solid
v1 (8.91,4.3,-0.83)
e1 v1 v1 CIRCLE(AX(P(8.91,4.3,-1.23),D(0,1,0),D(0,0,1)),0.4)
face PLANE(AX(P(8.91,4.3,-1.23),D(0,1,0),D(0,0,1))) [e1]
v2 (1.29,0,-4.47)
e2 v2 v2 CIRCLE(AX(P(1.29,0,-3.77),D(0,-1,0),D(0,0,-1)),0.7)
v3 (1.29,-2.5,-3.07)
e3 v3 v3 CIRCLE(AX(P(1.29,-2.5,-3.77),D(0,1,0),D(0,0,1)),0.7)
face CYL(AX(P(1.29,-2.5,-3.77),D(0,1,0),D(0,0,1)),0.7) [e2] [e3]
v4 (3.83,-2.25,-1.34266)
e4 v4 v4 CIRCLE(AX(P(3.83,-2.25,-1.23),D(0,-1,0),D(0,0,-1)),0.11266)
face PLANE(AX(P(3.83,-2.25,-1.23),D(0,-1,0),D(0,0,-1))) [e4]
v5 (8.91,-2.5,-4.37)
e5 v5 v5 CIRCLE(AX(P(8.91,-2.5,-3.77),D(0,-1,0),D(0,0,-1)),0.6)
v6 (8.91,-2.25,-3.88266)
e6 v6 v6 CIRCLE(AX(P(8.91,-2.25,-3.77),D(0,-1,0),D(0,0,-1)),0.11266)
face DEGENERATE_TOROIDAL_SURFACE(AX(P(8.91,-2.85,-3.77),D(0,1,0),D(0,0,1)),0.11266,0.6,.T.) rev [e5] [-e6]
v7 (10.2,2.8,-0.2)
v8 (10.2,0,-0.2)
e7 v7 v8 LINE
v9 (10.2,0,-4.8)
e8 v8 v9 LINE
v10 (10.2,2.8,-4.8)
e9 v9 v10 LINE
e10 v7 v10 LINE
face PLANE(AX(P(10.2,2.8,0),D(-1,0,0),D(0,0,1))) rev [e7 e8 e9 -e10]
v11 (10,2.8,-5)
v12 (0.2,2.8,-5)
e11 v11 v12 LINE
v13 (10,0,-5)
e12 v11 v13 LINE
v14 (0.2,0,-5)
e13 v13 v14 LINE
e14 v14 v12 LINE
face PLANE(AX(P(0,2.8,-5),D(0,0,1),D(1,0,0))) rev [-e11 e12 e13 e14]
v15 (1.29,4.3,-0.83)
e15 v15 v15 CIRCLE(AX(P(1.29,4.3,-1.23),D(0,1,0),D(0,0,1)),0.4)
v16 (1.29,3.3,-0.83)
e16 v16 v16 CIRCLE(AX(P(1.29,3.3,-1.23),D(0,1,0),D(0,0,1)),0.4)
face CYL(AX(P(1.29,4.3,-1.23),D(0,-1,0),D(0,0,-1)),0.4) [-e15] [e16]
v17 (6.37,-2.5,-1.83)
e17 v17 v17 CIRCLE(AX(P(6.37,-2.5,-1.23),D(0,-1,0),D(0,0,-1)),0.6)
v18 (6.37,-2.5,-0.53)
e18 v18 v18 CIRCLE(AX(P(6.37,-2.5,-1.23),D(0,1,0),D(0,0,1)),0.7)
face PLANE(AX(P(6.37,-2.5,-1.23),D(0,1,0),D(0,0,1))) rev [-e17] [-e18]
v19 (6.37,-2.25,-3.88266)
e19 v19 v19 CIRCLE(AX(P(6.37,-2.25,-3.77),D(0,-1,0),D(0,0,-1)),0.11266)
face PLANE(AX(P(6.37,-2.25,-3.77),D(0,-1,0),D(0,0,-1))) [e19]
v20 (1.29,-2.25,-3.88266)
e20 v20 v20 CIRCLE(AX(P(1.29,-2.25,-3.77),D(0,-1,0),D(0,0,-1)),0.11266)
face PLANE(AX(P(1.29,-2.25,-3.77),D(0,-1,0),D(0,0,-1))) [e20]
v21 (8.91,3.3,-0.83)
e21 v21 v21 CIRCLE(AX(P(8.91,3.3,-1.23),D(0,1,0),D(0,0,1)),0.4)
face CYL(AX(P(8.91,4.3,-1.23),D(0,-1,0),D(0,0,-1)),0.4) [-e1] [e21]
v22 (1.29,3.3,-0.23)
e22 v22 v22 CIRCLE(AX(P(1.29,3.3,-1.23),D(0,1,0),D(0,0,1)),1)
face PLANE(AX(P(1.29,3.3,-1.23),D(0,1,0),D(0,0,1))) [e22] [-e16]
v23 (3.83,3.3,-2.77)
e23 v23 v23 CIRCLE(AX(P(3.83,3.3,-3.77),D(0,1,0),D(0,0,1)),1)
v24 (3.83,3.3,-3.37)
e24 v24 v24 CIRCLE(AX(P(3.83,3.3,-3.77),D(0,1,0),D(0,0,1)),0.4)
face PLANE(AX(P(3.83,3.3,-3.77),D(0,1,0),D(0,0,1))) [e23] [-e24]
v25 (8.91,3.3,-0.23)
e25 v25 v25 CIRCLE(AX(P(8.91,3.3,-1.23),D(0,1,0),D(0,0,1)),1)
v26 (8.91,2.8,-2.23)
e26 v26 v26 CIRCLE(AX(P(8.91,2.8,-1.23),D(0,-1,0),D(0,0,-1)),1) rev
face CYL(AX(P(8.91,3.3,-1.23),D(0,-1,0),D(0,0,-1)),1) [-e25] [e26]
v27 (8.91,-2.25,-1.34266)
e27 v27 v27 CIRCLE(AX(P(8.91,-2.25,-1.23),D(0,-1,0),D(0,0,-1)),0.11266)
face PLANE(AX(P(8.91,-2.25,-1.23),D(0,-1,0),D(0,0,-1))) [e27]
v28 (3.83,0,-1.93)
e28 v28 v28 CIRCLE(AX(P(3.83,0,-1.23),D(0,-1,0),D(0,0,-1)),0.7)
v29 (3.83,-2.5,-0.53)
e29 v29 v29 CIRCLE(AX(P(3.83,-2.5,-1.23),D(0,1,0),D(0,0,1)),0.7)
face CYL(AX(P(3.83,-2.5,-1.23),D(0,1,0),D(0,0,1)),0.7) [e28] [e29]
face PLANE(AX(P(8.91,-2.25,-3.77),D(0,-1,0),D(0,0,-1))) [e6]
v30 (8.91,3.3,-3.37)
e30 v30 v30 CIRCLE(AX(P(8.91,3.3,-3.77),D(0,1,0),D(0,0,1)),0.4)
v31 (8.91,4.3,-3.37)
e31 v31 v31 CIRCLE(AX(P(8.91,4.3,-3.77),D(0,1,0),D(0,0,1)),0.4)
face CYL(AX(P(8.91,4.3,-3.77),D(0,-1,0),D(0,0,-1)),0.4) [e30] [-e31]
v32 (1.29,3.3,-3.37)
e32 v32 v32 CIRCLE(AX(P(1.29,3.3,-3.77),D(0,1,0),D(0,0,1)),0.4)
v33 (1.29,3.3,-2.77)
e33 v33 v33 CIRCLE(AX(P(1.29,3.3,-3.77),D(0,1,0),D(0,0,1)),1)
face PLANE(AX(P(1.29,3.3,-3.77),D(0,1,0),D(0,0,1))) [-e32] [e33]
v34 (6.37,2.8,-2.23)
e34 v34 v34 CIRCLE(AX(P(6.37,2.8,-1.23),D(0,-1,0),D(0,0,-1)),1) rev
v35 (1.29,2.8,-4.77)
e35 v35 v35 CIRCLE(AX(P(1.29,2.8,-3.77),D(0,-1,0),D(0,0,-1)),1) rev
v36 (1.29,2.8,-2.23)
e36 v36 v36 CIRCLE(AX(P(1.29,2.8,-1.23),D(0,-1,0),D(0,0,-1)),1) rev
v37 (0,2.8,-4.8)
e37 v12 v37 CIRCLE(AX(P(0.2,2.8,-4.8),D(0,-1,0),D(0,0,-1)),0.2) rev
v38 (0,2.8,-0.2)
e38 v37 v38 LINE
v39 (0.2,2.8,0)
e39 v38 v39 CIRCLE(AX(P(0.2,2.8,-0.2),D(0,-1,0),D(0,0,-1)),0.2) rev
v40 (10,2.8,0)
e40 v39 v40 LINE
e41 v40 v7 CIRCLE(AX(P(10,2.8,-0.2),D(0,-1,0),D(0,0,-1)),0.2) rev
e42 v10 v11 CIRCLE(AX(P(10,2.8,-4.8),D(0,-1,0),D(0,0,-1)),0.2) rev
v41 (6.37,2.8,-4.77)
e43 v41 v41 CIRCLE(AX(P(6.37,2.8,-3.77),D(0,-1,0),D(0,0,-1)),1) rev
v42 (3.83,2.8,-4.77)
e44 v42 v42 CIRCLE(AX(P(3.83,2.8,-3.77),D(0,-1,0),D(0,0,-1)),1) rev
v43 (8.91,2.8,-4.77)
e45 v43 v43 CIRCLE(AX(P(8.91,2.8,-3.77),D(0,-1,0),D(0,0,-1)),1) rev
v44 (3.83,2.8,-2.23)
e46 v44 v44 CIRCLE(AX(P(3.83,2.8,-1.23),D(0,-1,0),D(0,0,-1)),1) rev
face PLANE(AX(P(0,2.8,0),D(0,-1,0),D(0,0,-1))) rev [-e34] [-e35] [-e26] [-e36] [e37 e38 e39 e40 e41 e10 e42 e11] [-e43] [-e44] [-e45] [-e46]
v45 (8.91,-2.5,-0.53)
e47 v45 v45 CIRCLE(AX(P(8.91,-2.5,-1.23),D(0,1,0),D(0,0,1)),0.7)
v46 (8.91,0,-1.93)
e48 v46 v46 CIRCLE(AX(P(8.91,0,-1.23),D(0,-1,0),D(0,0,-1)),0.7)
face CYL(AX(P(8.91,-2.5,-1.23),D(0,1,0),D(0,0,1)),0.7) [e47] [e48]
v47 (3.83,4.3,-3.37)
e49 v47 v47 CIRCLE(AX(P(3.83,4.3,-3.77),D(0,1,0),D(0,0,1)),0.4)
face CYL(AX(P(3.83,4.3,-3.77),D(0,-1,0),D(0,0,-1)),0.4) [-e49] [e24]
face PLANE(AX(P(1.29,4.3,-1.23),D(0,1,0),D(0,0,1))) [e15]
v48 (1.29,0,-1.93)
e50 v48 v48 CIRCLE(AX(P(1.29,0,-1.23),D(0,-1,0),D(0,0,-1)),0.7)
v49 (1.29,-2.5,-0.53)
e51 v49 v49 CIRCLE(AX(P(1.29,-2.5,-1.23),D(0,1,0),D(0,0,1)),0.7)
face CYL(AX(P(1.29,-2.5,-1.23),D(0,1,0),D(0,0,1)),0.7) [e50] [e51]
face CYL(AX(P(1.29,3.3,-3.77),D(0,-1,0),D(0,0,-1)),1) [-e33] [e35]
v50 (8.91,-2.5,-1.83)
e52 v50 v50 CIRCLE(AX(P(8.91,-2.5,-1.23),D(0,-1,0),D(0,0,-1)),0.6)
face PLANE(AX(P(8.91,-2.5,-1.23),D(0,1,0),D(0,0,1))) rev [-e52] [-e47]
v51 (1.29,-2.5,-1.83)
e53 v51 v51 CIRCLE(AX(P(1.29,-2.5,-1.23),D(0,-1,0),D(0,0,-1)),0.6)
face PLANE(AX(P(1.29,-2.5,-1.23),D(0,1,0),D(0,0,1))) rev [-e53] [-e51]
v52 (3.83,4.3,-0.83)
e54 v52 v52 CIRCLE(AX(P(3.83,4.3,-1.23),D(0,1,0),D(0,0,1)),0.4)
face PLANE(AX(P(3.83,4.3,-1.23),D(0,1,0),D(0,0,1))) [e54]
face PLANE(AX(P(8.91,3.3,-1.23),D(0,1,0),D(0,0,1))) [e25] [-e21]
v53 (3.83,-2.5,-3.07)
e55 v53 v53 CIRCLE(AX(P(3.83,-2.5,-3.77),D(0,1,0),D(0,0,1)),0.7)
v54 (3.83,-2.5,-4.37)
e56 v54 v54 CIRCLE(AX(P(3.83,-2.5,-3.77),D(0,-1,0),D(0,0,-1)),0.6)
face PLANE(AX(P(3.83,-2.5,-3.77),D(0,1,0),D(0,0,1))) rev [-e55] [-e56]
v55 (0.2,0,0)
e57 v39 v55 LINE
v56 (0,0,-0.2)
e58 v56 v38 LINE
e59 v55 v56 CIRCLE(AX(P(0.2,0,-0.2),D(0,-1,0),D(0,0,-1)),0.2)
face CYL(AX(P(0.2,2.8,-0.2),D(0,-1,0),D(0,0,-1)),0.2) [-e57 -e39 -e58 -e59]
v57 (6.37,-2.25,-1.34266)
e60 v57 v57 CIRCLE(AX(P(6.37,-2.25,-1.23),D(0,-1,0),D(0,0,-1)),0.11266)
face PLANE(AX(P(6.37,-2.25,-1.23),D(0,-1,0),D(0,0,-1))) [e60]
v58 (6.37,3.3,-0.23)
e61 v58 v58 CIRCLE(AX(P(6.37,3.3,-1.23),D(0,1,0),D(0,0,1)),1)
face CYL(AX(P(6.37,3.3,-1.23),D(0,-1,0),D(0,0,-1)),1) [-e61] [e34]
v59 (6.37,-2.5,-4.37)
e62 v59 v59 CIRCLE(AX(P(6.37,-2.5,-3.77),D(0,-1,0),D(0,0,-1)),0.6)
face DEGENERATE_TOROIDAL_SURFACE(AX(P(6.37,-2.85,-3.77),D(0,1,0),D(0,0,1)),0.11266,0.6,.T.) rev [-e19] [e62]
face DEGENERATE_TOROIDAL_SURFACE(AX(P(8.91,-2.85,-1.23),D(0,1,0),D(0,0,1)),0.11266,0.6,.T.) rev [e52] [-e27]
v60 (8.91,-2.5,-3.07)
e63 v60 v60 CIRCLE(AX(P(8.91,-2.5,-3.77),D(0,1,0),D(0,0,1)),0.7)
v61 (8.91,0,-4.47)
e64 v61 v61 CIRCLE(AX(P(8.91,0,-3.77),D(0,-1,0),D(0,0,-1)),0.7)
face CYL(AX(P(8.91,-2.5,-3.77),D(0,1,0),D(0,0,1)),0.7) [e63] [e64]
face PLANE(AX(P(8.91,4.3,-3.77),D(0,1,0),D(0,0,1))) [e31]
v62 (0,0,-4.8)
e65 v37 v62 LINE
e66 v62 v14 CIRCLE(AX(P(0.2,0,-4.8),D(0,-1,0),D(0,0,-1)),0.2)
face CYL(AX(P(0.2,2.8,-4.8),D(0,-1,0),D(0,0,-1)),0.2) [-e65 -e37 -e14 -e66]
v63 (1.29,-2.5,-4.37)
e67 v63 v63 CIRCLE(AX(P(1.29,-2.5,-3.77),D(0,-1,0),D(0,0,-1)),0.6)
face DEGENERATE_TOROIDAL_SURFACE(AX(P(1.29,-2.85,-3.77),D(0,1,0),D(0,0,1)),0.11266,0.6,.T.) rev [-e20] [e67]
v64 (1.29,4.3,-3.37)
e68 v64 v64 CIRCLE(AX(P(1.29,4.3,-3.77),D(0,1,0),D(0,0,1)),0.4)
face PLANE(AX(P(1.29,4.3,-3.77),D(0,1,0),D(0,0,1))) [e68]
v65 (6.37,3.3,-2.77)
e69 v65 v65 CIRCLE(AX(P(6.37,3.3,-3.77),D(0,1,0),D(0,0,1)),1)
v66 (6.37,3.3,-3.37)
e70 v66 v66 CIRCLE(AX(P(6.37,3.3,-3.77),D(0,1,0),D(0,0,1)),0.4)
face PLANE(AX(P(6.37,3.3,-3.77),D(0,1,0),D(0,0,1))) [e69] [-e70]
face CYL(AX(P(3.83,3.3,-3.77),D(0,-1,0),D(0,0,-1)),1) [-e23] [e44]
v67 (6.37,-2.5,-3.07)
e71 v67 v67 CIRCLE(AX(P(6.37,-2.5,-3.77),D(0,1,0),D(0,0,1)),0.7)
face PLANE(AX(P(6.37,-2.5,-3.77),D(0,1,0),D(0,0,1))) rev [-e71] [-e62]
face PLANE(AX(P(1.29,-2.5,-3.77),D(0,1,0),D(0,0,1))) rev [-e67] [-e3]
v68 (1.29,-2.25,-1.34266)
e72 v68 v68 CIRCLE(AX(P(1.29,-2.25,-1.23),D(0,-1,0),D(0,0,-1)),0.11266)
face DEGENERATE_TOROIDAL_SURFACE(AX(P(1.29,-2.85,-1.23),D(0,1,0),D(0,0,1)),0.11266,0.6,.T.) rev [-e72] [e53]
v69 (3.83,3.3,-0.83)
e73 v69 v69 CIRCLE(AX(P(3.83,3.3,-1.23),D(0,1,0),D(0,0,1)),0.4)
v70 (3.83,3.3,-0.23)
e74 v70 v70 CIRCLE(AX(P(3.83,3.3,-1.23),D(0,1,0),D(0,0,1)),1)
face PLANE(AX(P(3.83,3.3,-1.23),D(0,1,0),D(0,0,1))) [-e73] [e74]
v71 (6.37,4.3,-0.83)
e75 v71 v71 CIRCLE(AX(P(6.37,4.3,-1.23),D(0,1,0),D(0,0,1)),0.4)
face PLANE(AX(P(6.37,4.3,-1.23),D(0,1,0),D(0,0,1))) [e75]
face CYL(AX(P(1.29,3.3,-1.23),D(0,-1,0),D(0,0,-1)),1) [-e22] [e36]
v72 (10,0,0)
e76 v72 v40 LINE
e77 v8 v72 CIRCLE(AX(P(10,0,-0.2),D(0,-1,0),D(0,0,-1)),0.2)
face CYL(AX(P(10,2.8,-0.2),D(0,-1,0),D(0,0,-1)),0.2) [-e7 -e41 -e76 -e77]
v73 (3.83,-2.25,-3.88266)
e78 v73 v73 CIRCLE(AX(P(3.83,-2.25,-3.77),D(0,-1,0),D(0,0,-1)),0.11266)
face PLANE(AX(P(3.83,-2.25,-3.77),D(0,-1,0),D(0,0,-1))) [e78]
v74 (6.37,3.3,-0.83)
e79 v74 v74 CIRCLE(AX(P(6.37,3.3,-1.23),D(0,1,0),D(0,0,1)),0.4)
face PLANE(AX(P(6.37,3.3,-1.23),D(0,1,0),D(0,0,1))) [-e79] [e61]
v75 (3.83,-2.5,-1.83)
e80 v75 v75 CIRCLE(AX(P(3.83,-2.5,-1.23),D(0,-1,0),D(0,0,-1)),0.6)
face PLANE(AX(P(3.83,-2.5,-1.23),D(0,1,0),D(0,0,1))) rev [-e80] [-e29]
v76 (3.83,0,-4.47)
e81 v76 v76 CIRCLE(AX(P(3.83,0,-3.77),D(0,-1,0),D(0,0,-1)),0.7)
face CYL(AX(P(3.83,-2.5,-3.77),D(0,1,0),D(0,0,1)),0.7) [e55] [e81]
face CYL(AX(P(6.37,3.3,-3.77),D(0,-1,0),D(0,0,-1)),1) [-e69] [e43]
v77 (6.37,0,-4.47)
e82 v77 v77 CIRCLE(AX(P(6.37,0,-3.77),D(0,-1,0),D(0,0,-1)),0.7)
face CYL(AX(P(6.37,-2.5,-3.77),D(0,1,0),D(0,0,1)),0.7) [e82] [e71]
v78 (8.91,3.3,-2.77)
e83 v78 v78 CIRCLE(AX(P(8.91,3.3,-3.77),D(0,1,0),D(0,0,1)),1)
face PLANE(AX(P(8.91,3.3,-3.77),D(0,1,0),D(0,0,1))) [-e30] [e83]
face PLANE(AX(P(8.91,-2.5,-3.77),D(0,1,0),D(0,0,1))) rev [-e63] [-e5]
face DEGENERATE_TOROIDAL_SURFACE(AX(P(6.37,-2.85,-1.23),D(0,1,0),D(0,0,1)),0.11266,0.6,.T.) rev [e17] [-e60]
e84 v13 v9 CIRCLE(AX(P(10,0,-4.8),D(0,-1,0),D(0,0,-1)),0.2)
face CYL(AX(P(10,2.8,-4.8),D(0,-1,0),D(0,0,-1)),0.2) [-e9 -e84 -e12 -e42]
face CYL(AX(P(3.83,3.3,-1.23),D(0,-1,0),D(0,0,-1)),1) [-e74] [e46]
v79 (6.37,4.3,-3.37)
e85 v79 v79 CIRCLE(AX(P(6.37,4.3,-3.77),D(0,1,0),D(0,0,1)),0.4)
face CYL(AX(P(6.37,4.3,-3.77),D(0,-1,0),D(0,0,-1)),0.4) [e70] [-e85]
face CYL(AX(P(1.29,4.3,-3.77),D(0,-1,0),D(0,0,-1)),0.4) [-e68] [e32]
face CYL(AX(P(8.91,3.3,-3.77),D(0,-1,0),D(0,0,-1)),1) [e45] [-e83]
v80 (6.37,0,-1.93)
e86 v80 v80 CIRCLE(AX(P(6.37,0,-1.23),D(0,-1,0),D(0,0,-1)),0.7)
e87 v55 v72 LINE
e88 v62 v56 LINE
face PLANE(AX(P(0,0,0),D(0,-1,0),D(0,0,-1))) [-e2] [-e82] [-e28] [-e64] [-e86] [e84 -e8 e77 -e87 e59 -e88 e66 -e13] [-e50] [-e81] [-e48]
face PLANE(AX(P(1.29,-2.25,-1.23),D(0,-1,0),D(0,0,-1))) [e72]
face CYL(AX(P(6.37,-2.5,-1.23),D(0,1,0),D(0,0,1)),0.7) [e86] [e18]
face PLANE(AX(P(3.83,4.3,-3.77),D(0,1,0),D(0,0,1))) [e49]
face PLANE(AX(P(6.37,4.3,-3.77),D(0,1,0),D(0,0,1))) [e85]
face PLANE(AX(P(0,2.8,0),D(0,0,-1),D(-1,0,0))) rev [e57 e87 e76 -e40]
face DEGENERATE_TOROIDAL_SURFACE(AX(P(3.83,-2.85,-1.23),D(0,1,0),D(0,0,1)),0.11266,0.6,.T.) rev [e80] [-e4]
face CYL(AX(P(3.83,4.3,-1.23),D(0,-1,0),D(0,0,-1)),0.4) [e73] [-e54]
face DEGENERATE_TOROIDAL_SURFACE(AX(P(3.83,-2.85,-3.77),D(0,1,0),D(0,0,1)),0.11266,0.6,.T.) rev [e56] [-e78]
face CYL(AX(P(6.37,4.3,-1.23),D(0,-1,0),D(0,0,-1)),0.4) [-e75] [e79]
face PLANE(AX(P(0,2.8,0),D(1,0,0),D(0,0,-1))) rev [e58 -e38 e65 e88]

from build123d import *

# Parameters (mm, degrees)
SKETCH_1_W          = 10.2
SKETCH_1_H          = 5
EXTRUDE_1_DEPTH     = 2.8
SKETCH_2_R          = 1
EXTRUDE_2_DEPTH     = 0.5
SKETCH_3_R          = 0.4
EXTRUDE_3_DEPTH     = 1
SKETCH_4_R          = 0.7
EXTRUDE_4_DEPTH     = 5.8
SKETCH_5_R          = 0.6
CUT_EXTRUDE_1_DEPTH = 0.25
FILLET_1_R          = 0.6
FILLET_2_R          = 0.2


with BuildPart() as part:
    # 草图1 → 凸台-拉伸1 (new body)
    with BuildSketch(Plane(origin=(0, 0, 0), x_dir=(1, 0, 0), z_dir=(0, 1, 0))):
        with Locations((5.1, 2.5)):
            Rectangle(SKETCH_1_W, SKETCH_1_H)
    extrude(amount=EXTRUDE_1_DEPTH)

    # 草图2 → 凸台-拉伸2 (add)
    with BuildSketch(Plane(origin=(0, 2.8, 0), x_dir=(1, 0, 0), z_dir=(0, 1, 0))):
        with Locations(Location((1.29, 3.77, 0), (0, 0, 90))):
            Circle(SKETCH_2_R)
        with Locations(Location((3.83, 3.77, 0), (0, 0, 90))):
            Circle(SKETCH_2_R)
        with Locations(Location((6.37, 3.77, 0), (0, 0, 90))):
            Circle(SKETCH_2_R)
        with Locations(Location((8.91, 3.77, 0), (0, 0, 90))):
            Circle(SKETCH_2_R)
        with Locations(Location((3.83, 1.23, 0), (0, 0, 90))):
            Circle(SKETCH_2_R)
        with Locations(Location((6.37, 1.23, 0), (0, 0, 90))):
            Circle(SKETCH_2_R)
        with Locations(Location((8.91, 1.23, 0), (0, 0, 90))):
            Circle(SKETCH_2_R)
        with Locations(Location((1.29, 1.23, 0), (0, 0, 90))):
            Circle(SKETCH_2_R)
    extrude(amount=EXTRUDE_2_DEPTH)

    # 草图3 → 凸台-拉伸3 (add)
    with BuildSketch(Plane(origin=(0, 3.3, 0), x_dir=(1, 0, 0), z_dir=(0, 1, 0))):
        with Locations(Location((1.29, 1.23, 0), (0, 0, 270))):
            Circle(SKETCH_3_R)
        with Locations(Location((3.83, 1.23, 0), (0, 0, 270))):
            Circle(SKETCH_3_R)
        with Locations(Location((6.37, 1.23, 0), (0, 0, 270))):
            Circle(SKETCH_3_R)
        with Locations(Location((8.91, 1.23, 0), (0, 0, 270))):
            Circle(SKETCH_3_R)
        with Locations(Location((3.83, 3.77, 0), (0, 0, 270))):
            Circle(SKETCH_3_R)
        with Locations(Location((6.37, 3.77, 0), (0, 0, 270))):
            Circle(SKETCH_3_R)
        with Locations(Location((8.91, 3.77, 0), (0, 0, 270))):
            Circle(SKETCH_3_R)
        with Locations(Location((1.29, 3.77, 0), (0, 0, 270))):
            Circle(SKETCH_3_R)
    extrude(amount=EXTRUDE_3_DEPTH)

    # 草图4 → 凸台-拉伸4 (add)
    with BuildSketch(Plane(origin=(0, 3.3, 0), x_dir=(1, 0, 0), z_dir=(0, 1, 0))):
        with Locations(Location((1.29, 1.23, 0), (0, 0, 270))):
            Circle(SKETCH_4_R)
        with Locations(Location((3.83, 1.23, 0), (0, 0, 270))):
            Circle(SKETCH_4_R)
        with Locations(Location((6.37, 1.23, 0), (0, 0, 270))):
            Circle(SKETCH_4_R)
        with Locations(Location((8.91, 1.23, 0), (0, 0, 270))):
            Circle(SKETCH_4_R)
        with Locations(Location((3.83, 3.77, 0), (0, 0, 270))):
            Circle(SKETCH_4_R)
        with Locations(Location((6.37, 3.77, 0), (0, 0, 270))):
            Circle(SKETCH_4_R)
        with Locations(Location((8.91, 3.77, 0), (0, 0, 270))):
            Circle(SKETCH_4_R)
        with Locations(Location((1.29, 3.77, 0), (0, 0, 270))):
            Circle(SKETCH_4_R)
    extrude(amount=-EXTRUDE_4_DEPTH)

    # 草图5 → 切除-拉伸1 (cut)
    with BuildSketch(Plane.XZ.offset(2.5)):
        with Locations(Location((8.91, -1.23, 0), (0, 0, 270))):
            Circle(SKETCH_5_R)
        with Locations(Location((6.37, -1.23, 0), (0, 0, 270))):
            Circle(SKETCH_5_R)
        with Locations(Location((3.83, -1.23, 0), (0, 0, 270))):
            Circle(SKETCH_5_R)
        with Locations(Location((1.29, -1.23, 0), (0, 0, 270))):
            Circle(SKETCH_5_R)
        with Locations(Location((6.37, -3.77, 0), (0, 0, 270))):
            Circle(SKETCH_5_R)
        with Locations(Location((3.83, -3.77, 0), (0, 0, 270))):
            Circle(SKETCH_5_R)
        with Locations(Location((1.29, -3.77, 0), (0, 0, 270))):
            Circle(SKETCH_5_R)
        with Locations(Location((8.91, -3.77, 0), (0, 0, 270))):
            Circle(SKETCH_5_R)
    extrude(amount=-CUT_EXTRUDE_1_DEPTH, mode=Mode.SUBTRACT)

    # 圆角1
    # the kernel refuses this fillet: 0.6 mm, written as the material it adds along each edge
    with BuildSketch(Plane(origin=(6.37, -2.25, -3.77), x_dir=(0, 0, -1), z_dir=(-1, 0, 0))) as fillet_1_piece_1:
        with BuildLine():
            CenterArc((0.112660283, 0.6), FILLET_1_R, 270, 54.314665288)
            Line((0.112660283, 0), (0.112660283, -0.012))
            Line((0.112660283, -0.012), (0.6, -0.012))
            Line((0.6, -0.012), (0.612, 0))
            ThreePointArc((0.612, 0), (0.612, 0.125), (0.609746794, 0.243))
            Line((0.609746794, 0.243), (0.6, 0.25))
        make_face()
    revolve(axis=Axis((6.37, -2.25, -3.77), (0, -1, 0)))
    with BuildSketch(Plane(origin=(1.29, -2.25, -1.23), x_dir=(0, 0, -1), z_dir=(-1, 0, 0))) as fillet_1_piece_2:
        with BuildLine():
            CenterArc((0.112660283, 0.6), FILLET_1_R, 270, 54.314665288)
            Line((0.112660283, 0), (0.112660283, -0.012))
            Line((0.112660283, -0.012), (0.6, -0.012))
            Line((0.6, -0.012), (0.612, 0))
            ThreePointArc((0.612, 0), (0.612, 0.125), (0.609746794, 0.243))
            Line((0.609746794, 0.243), (0.6, 0.25))
        make_face()
    revolve(axis=Axis((1.29, -2.25, -1.23), (0, -1, 0)))
    with BuildSketch(Plane(origin=(3.83, -2.25, -1.23), x_dir=(0, 0, -1), z_dir=(-1, 0, 0))) as fillet_1_piece_3:
        with BuildLine():
            CenterArc((0.112660283, 0.6), FILLET_1_R, 270, 54.314665288)
            Line((0.112660283, 0), (0.112660283, -0.012))
            Line((0.112660283, -0.012), (0.6, -0.012))
            Line((0.6, -0.012), (0.612, 0))
            ThreePointArc((0.612, 0), (0.612, 0.125), (0.609746794, 0.243))
            Line((0.609746794, 0.243), (0.6, 0.25))
        make_face()
    revolve(axis=Axis((3.83, -2.25, -1.23), (0, -1, 0)))
    with BuildSketch(Plane(origin=(6.37, -2.25, -1.23), x_dir=(0, 0, -1), z_dir=(-1, 0, 0))) as fillet_1_piece_4:
        with BuildLine():
            CenterArc((0.112660283, 0.6), FILLET_1_R, 270, 54.314665288)
            Line((0.112660283, 0), (0.112660283, -0.012))
            Line((0.112660283, -0.012), (0.6, -0.012))
            Line((0.6, -0.012), (0.612, 0))
            ThreePointArc((0.612, 0), (0.612, 0.125), (0.609746794, 0.243))
            Line((0.609746794, 0.243), (0.6, 0.25))
        make_face()
    revolve(axis=Axis((6.37, -2.25, -1.23), (0, -1, 0)))
    with BuildSketch(Plane(origin=(3.83, -2.25, -3.77), x_dir=(0, 0, -1), z_dir=(-1, 0, 0))) as fillet_1_piece_5:
        with BuildLine():
            CenterArc((0.112660283, 0.6), FILLET_1_R, 270, 54.314665288)
            Line((0.112660283, 0), (0.112660283, -0.012))
            Line((0.112660283, -0.012), (0.6, -0.012))
            Line((0.6, -0.012), (0.612, 0))
            ThreePointArc((0.612, 0), (0.612, 0.125), (0.609746794, 0.243))
            Line((0.609746794, 0.243), (0.6, 0.25))
        make_face()
    revolve(axis=Axis((3.83, -2.25, -3.77), (0, -1, 0)))
    with BuildSketch(Plane(origin=(1.29, -2.25, -3.77), x_dir=(0, 0, -1), z_dir=(-1, 0, 0))) as fillet_1_piece_6:
        with BuildLine():
            CenterArc((0.112660283, 0.6), FILLET_1_R, 270, 54.314665288)
            Line((0.112660283, 0), (0.112660283, -0.012))
            Line((0.112660283, -0.012), (0.6, -0.012))
            Line((0.6, -0.012), (0.612, 0))
            ThreePointArc((0.612, 0), (0.612, 0.125), (0.609746794, 0.243))
            Line((0.609746794, 0.243), (0.6, 0.25))
        make_face()
    revolve(axis=Axis((1.29, -2.25, -3.77), (0, -1, 0)))
    with BuildSketch(Plane(origin=(8.91, -2.25, -3.77), x_dir=(0, 0, -1), z_dir=(-1, 0, 0))) as fillet_1_piece_7:
        with BuildLine():
            CenterArc((0.112660283, 0.6), FILLET_1_R, 270, 54.314665288)
            Line((0.112660283, 0), (0.112660283, -0.012))
            Line((0.112660283, -0.012), (0.6, -0.012))
            Line((0.6, -0.012), (0.612, 0))
            ThreePointArc((0.612, 0), (0.612, 0.125), (0.609746794, 0.243))
            Line((0.609746794, 0.243), (0.6, 0.25))
        make_face()
    revolve(axis=Axis((8.91, -2.25, -3.77), (0, -1, 0)))
    with BuildSketch(Plane(origin=(8.91, -2.25, -1.23), x_dir=(0, 0, -1), z_dir=(-1, 0, 0))) as fillet_1_piece_8:
        with BuildLine():
            CenterArc((0.112660283, 0.6), FILLET_1_R, 270, 54.314665288)
            Line((0.112660283, 0), (0.112660283, -0.012))
            Line((0.112660283, -0.012), (0.6, -0.012))
            Line((0.6, -0.012), (0.612, 0))
            ThreePointArc((0.612, 0), (0.612, 0.125), (0.609746794, 0.243))
            Line((0.609746794, 0.243), (0.6, 0.25))
        make_face()
    revolve(axis=Axis((8.91, -2.25, -1.23), (0, -1, 0)))

    # 圆角2
    fillet_2_edges = [part.edges().sort_by_distance(p)[0] for p in [
        (0, 1.4, -5),
        (10.2, 1.4, -5),
        (10.2, 1.4, 0),
        (0, 1.4, 0),
    ]]
    fillet(fillet_2_edges, radius=FILLET_2_R)


solid = part.part
